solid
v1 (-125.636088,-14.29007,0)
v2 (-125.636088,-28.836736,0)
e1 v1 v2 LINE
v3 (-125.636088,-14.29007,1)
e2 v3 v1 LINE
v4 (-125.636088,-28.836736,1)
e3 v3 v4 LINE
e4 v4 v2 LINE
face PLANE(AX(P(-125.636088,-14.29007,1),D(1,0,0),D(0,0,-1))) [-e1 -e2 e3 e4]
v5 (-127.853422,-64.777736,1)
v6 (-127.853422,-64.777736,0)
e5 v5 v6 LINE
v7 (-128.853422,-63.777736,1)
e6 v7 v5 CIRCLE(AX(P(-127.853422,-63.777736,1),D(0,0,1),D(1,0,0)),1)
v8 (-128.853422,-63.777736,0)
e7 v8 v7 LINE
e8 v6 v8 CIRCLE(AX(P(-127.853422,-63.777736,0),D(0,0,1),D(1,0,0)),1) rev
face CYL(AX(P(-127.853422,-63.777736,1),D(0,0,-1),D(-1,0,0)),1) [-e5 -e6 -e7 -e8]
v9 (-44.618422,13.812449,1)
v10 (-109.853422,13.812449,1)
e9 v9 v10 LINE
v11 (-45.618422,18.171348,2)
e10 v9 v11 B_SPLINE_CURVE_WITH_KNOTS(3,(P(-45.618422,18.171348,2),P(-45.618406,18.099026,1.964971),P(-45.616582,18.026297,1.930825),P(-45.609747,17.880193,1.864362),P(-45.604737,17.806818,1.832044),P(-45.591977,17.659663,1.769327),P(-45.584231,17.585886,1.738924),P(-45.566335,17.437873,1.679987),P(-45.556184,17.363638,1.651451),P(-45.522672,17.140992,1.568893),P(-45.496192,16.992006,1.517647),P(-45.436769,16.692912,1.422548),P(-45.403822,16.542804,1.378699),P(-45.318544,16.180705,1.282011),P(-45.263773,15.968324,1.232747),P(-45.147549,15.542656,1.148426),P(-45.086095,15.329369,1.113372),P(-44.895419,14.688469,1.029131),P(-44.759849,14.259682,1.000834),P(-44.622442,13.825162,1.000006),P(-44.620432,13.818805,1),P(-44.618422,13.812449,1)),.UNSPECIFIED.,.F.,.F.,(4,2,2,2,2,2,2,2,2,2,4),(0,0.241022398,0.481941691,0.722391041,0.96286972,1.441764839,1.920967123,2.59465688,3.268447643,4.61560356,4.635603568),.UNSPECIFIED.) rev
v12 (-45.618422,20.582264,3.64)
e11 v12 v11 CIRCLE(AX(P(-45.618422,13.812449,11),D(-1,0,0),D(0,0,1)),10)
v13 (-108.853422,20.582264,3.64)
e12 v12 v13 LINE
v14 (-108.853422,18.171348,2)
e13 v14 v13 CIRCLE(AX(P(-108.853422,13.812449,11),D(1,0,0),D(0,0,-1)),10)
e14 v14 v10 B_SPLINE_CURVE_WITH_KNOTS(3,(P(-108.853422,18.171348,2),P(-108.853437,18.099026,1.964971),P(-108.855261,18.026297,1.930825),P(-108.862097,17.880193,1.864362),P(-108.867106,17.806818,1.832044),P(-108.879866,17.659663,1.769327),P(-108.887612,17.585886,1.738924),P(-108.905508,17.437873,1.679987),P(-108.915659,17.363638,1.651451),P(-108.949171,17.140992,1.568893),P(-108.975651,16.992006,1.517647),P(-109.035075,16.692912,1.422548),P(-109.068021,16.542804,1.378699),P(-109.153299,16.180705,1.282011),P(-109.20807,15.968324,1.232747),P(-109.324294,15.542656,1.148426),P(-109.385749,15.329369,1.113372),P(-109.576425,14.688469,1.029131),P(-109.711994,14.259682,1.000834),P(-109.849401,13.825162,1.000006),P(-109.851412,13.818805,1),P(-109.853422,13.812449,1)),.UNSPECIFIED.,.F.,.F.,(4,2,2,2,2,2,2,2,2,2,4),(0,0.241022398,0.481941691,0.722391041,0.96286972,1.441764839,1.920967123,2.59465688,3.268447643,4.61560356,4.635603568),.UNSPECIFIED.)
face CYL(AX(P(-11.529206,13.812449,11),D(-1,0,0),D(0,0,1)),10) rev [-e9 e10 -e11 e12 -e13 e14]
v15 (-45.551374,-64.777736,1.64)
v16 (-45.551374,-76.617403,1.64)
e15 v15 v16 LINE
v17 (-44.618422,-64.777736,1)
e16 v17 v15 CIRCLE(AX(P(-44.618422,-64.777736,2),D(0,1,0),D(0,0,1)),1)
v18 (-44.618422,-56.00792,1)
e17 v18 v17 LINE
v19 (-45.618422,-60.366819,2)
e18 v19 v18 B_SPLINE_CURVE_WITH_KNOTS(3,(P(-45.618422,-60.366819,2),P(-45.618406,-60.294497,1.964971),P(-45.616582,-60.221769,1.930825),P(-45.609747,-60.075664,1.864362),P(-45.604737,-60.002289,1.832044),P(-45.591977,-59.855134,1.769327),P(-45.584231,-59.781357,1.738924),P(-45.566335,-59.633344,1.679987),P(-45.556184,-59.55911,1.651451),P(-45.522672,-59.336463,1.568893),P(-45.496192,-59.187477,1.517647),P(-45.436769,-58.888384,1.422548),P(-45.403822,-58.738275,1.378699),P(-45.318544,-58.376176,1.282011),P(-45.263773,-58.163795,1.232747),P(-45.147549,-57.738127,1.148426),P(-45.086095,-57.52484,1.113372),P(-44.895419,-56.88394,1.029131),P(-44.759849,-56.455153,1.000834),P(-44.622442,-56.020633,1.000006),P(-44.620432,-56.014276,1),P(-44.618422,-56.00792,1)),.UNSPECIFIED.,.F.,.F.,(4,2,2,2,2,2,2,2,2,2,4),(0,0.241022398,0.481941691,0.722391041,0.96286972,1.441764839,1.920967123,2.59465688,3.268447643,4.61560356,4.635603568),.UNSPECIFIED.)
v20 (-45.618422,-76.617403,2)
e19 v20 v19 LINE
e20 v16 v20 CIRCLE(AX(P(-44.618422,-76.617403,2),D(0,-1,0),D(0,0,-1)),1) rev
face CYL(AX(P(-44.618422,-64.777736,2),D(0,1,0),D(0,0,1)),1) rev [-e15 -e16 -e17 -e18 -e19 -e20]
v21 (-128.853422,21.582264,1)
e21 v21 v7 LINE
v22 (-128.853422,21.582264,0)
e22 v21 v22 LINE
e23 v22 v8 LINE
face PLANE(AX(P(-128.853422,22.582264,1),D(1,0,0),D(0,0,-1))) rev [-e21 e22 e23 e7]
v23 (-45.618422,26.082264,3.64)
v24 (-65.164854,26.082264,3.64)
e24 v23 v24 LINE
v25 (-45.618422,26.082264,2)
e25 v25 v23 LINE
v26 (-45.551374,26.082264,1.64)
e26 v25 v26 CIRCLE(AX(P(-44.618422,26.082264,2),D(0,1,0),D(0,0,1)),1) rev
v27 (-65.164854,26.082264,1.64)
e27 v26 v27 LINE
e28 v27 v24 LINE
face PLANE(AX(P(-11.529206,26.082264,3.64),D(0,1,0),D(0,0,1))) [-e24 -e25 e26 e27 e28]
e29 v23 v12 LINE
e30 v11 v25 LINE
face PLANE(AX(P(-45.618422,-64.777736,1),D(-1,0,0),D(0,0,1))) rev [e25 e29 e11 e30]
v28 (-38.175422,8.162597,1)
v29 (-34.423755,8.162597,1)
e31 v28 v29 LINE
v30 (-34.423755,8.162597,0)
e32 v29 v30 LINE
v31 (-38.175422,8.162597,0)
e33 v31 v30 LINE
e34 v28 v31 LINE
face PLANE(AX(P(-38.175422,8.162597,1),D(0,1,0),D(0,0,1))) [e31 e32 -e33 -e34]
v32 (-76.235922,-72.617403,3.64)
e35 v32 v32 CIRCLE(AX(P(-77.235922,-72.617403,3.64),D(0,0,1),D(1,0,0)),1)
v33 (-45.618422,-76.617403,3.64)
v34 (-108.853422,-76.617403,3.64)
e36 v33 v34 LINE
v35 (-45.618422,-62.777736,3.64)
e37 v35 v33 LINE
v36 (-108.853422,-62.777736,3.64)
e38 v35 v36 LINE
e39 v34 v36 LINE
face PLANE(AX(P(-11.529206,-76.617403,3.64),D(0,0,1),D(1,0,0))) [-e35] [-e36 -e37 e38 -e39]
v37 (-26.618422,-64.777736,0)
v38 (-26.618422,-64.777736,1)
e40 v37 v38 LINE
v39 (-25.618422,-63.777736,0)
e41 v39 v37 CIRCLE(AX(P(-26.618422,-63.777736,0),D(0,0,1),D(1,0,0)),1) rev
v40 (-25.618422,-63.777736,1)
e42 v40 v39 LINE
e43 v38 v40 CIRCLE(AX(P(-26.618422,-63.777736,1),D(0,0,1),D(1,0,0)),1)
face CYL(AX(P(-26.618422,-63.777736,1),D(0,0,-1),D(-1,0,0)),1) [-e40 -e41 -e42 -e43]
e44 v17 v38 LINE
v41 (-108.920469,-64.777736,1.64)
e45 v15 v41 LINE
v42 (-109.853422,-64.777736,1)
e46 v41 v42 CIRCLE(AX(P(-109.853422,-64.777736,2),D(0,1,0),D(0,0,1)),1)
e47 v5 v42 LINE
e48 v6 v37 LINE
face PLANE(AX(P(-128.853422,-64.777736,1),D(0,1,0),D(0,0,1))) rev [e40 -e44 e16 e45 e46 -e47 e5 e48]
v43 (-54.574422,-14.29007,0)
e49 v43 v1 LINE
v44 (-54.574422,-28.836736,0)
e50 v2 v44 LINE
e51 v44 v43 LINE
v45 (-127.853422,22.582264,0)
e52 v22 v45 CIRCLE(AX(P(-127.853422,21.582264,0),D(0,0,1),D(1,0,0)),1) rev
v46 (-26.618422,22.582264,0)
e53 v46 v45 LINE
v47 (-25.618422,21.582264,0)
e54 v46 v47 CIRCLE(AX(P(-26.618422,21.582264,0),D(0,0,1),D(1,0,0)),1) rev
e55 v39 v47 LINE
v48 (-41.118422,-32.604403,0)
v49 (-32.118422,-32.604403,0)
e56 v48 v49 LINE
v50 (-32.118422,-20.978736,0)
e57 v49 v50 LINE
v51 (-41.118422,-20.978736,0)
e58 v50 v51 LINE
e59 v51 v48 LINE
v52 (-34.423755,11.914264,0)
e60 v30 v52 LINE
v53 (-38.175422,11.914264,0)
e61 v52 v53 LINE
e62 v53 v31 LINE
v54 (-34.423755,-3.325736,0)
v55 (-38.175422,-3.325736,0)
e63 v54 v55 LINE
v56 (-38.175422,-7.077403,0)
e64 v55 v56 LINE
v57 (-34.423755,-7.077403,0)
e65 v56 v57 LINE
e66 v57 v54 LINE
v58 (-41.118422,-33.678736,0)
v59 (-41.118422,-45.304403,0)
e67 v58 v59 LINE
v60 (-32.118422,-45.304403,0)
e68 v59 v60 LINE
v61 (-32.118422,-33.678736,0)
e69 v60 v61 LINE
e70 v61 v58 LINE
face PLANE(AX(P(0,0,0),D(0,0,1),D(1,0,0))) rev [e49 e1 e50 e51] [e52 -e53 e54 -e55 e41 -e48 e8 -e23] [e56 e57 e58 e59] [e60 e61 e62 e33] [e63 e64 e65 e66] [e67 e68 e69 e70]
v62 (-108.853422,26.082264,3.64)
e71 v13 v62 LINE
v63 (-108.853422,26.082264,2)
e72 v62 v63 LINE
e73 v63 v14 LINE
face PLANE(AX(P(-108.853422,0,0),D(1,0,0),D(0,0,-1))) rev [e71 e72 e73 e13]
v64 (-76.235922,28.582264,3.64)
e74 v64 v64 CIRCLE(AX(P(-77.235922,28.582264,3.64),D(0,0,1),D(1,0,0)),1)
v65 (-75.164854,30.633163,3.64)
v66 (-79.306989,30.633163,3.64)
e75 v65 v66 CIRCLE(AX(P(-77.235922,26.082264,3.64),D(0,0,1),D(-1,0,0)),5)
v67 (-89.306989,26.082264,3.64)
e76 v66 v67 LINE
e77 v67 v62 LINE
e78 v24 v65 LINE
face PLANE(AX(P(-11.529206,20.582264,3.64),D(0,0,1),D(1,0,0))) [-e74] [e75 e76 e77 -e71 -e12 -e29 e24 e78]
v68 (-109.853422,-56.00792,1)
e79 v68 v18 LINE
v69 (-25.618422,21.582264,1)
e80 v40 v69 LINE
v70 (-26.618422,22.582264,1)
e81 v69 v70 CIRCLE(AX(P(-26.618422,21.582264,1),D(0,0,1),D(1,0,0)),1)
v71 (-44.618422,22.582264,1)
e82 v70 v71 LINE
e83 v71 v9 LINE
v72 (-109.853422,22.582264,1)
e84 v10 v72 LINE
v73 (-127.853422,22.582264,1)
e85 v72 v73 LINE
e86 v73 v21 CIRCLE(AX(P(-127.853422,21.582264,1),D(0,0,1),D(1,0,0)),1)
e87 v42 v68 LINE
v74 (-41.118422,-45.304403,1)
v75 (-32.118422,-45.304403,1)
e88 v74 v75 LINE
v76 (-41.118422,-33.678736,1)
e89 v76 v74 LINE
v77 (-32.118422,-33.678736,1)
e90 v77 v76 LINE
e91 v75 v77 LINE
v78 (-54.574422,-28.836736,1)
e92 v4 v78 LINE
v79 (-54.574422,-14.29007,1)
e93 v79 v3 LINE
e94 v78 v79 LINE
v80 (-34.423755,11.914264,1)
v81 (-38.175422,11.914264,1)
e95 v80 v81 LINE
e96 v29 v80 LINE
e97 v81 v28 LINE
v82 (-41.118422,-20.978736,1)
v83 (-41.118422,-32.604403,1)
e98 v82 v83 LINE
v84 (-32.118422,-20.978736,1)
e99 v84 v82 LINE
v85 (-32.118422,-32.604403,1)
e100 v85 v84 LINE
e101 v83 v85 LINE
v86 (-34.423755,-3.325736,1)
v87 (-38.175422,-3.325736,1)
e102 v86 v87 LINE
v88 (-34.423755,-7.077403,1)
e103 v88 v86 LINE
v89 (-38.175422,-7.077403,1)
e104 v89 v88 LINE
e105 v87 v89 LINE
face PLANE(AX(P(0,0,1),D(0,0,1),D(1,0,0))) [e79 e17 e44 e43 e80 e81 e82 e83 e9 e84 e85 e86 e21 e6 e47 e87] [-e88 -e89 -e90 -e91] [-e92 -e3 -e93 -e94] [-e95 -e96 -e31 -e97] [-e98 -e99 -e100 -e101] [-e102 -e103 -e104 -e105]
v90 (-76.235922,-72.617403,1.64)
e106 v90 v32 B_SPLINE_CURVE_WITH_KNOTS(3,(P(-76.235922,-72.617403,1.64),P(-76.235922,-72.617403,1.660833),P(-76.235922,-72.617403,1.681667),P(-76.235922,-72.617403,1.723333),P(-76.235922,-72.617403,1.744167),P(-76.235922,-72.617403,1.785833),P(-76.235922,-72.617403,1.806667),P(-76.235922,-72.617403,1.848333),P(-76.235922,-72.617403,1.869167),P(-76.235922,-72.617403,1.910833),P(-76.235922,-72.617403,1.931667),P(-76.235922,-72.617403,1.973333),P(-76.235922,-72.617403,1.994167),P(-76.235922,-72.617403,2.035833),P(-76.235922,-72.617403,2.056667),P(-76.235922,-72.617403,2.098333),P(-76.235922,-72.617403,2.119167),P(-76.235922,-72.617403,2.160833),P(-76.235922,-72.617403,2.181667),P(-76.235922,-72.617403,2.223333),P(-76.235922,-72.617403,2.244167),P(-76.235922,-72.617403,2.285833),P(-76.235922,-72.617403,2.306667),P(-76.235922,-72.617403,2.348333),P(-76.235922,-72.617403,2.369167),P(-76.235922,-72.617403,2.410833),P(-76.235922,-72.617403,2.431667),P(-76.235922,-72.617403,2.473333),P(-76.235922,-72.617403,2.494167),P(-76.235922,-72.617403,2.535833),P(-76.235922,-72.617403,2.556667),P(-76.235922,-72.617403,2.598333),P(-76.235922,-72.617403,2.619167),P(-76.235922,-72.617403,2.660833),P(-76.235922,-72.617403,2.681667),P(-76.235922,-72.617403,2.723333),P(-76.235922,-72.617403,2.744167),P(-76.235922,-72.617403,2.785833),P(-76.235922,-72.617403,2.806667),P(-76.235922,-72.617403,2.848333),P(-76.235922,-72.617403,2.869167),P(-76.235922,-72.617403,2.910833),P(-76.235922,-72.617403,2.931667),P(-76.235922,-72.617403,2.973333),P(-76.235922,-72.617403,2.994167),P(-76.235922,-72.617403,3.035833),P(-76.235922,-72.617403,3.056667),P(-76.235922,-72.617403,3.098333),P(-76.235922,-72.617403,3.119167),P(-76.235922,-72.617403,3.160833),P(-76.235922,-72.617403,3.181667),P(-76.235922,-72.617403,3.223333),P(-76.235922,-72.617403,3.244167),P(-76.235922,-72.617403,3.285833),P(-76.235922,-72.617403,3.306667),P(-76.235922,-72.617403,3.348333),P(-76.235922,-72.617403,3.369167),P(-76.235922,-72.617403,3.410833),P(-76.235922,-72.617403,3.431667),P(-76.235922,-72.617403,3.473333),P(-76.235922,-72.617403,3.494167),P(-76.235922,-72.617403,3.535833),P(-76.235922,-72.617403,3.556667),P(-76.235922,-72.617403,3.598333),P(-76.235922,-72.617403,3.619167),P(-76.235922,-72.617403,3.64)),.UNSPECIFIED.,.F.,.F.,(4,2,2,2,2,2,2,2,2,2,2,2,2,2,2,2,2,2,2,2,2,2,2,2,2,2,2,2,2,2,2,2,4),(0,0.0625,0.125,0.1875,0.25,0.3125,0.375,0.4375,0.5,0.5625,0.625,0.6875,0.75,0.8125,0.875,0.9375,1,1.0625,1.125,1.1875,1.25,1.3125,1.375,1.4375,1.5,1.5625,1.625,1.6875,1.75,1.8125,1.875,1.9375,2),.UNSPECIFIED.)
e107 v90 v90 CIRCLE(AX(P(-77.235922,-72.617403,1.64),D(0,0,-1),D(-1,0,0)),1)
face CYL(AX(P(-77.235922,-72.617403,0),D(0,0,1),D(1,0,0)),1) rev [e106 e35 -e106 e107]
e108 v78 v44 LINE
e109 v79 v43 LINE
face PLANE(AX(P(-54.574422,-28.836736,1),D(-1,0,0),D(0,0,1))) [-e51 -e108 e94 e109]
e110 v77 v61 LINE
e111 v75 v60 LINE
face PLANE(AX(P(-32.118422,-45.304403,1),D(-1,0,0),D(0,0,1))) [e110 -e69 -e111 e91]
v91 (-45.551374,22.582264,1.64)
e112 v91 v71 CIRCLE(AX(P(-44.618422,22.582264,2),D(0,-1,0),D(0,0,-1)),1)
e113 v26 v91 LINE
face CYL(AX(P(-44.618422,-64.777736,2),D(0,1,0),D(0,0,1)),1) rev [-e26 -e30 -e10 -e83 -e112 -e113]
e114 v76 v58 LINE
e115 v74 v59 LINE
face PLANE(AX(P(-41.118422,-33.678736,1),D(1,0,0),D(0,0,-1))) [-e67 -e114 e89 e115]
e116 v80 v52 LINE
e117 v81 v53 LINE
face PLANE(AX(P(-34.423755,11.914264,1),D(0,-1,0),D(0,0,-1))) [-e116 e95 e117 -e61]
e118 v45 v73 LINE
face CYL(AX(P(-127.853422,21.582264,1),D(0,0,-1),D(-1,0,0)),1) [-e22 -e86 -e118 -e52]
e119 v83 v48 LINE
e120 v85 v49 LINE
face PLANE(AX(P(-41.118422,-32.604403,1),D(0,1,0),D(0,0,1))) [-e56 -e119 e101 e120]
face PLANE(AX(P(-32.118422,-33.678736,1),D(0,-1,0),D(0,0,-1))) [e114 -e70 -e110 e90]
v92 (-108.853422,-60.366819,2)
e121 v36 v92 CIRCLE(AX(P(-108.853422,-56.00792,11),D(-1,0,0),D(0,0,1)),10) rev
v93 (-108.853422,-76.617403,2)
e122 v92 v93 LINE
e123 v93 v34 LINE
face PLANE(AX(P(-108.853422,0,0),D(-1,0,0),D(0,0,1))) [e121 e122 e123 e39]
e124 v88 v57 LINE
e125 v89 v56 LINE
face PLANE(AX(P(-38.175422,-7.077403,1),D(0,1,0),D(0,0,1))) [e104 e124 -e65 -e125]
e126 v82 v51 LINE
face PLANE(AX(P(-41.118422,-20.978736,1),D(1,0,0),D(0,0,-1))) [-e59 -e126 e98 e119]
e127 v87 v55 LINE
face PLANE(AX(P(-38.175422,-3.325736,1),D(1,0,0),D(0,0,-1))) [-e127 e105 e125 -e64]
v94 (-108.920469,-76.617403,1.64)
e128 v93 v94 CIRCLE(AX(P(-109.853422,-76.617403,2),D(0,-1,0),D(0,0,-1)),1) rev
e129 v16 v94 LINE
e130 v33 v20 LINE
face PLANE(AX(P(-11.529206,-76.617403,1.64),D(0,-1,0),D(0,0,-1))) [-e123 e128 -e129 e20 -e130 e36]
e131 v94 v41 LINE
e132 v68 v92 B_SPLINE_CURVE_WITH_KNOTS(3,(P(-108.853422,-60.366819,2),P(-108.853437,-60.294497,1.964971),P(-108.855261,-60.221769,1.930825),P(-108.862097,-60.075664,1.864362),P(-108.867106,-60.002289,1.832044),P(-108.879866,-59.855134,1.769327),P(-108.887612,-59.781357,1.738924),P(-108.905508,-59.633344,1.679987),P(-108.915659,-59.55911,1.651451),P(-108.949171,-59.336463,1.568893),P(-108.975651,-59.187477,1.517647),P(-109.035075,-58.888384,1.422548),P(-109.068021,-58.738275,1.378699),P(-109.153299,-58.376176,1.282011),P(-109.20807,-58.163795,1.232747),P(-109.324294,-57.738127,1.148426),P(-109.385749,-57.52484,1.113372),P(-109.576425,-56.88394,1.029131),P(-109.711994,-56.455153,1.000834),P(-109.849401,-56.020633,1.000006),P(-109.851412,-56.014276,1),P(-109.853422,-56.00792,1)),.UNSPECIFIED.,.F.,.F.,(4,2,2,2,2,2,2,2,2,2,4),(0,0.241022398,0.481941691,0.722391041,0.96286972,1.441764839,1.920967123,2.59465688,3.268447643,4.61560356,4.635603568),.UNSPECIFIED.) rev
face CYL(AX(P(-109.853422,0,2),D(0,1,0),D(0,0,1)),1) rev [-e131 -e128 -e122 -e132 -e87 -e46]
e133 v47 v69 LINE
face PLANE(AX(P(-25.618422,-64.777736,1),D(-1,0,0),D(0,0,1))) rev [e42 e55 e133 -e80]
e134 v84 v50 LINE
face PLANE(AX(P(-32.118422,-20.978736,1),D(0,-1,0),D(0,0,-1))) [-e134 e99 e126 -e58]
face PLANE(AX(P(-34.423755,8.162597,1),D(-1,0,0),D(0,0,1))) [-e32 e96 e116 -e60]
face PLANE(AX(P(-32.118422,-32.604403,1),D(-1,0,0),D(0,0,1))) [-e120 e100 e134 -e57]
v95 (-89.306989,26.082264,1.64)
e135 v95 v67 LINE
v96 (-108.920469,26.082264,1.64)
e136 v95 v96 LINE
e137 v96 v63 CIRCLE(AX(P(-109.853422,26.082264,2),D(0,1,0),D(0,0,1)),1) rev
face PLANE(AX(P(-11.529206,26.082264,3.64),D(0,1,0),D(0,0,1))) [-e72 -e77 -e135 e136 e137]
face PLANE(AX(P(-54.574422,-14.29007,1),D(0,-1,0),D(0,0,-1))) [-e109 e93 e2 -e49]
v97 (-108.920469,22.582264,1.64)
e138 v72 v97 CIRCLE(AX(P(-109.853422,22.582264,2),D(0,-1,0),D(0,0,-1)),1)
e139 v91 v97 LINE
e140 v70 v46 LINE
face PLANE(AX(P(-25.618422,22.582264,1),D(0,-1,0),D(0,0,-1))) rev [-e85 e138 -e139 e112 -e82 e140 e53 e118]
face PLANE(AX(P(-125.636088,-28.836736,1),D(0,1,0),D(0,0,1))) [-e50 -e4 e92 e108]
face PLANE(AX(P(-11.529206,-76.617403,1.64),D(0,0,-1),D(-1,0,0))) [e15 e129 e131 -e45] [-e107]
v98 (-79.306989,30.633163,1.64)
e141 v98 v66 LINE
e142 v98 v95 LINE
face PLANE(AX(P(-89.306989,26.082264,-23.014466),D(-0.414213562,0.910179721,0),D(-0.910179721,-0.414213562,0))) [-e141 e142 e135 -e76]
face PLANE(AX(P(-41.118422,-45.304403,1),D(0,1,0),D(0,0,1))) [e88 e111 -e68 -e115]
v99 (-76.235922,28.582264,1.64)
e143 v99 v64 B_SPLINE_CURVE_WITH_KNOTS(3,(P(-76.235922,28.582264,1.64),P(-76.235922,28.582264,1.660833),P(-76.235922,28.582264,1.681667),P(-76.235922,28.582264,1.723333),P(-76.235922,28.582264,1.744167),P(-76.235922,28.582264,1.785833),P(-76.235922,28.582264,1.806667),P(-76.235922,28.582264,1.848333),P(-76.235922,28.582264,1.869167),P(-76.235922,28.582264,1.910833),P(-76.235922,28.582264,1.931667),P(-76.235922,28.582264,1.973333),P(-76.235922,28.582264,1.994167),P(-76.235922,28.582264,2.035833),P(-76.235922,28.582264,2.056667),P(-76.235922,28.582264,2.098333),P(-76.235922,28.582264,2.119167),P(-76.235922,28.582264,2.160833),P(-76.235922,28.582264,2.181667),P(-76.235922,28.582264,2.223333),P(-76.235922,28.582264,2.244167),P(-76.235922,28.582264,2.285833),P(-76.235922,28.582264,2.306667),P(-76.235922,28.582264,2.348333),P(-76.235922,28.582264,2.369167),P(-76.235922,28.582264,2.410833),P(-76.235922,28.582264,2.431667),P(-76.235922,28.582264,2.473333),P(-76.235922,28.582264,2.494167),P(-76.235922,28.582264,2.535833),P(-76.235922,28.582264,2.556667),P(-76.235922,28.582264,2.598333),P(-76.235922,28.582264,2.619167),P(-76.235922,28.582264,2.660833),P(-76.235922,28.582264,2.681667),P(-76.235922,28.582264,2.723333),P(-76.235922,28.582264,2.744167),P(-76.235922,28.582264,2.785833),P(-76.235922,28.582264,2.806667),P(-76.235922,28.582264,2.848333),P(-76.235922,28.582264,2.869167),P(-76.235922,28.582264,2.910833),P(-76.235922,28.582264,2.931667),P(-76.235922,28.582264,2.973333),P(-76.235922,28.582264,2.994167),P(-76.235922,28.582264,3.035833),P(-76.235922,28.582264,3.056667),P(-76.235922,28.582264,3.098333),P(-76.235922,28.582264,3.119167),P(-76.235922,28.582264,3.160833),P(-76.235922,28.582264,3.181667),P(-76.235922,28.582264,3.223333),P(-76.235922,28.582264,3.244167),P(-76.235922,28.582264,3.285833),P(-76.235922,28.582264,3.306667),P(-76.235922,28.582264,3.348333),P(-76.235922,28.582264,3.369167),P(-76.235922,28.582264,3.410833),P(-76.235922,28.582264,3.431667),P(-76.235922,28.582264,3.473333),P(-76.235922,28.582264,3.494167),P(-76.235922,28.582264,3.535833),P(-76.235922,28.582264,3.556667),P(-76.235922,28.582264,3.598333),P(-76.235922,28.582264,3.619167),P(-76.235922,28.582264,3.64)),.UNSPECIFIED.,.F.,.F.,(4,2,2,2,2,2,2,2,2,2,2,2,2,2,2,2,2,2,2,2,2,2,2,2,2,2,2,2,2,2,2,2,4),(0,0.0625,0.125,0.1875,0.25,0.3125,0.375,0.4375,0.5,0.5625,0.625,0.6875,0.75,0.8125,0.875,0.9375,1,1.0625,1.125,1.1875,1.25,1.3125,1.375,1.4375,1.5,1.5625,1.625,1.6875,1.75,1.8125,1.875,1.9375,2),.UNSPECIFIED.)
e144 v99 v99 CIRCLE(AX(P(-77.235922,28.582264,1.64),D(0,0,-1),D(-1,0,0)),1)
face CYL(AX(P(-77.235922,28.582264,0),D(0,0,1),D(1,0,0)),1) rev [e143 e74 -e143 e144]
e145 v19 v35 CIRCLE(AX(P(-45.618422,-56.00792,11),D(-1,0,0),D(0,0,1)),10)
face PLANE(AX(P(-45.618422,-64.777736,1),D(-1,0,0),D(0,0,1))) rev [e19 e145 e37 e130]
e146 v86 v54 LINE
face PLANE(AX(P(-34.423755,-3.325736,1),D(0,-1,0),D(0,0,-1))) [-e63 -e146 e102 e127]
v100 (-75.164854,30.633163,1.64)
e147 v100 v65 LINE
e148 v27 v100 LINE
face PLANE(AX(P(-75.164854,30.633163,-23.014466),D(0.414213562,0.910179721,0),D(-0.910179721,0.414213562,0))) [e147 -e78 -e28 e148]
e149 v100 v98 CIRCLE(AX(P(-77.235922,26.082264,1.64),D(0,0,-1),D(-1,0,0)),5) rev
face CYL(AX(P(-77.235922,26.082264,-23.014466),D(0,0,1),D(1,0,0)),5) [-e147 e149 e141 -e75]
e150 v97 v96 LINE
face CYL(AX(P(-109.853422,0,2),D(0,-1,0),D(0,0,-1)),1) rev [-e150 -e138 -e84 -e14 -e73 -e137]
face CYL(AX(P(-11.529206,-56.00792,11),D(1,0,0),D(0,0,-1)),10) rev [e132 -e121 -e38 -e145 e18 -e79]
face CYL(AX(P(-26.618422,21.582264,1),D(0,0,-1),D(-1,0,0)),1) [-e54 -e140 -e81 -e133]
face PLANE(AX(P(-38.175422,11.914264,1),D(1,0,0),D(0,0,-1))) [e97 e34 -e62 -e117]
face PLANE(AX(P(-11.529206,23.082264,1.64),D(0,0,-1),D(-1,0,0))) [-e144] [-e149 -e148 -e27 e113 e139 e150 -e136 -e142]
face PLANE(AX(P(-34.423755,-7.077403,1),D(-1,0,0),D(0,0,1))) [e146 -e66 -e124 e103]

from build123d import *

# Parameters (mm, degrees)
SKETCH2_W           = 103.235
SKETCH2_H           = 87.36
SKETCH2_W_2         = 9
SKETCH2_H_2         = 11.625667
SKETCH2_W_3         = 3.751667
SKETCH2_H_3         = 3.751667
SKETCH2_W_4         = 71.061666
SKETCH2_H_4         = 14.546666
BOSS_EXTRUDE1_DEPTH = 1
BOSS_EXTRUDE2_START = -20
BOSS_EXTRUDE2_DEPTH = 63.235
FILLET1_R           = 10
FILLET2_R           = 1
FILLET4_R           = 1
BOSS_EXTRUDE3_DEPTH = 2
SKETCH5_R           = 1
CUT_EXTRUDE1_DEPTH  = 150.95559423


with BuildPart() as part:
    # Sketch2 → Boss-Extrude1 (new body)
    with BuildSketch(Plane.XY):
        with Locations((-77.235921563, -21.097735573)):
            Rectangle(SKETCH2_W, SKETCH2_H)
        with Locations((-36.618421563, -39.491569073)):
            Rectangle(SKETCH2_W_2, SKETCH2_H_2, mode=Mode.SUBTRACT)
        with Locations((-36.618421563, -26.791569073)):
            Rectangle(SKETCH2_W_2, SKETCH2_H_2, mode=Mode.SUBTRACT)
        with Locations((-36.299588063, -5.201569073)):
            Rectangle(SKETCH2_W_3, SKETCH2_H_3, mode=Mode.SUBTRACT)
        with Locations((-36.299588063, 10.038430927)):
            Rectangle(SKETCH2_W_3, SKETCH2_H_3, mode=Mode.SUBTRACT)
        with Locations((-90.105254563, -21.563402573)):
            Rectangle(SKETCH2_W_4, SKETCH2_H_4, mode=Mode.SUBTRACT)
    extrude(amount=BOSS_EXTRUDE1_DEPTH)

    # Sketch4 → Boss-Extrude2 (add)
    with BuildSketch(Plane.ZY.offset(128.853421563).offset(BOSS_EXTRUDE2_START)):
        Polygon((1.64, 23.082264427), (1.64, 26.082264427), (3.64, 26.082264427), (3.64, 20.582264427), (1, 20.582264427), (1, 22.582264427), (1.64, 22.582264427), align=None)
        Polygon((1.64, -76.617402573), (1.64, -73.617402573), (1.64, -64.777735573), (1, -64.777735573), (1, -62.777735573), (3.64, -62.777735573), (3.64, -76.617402573), align=None)
    extrude(amount=-BOSS_EXTRUDE2_DEPTH)

    # Fillet1
    # the kernel refuses this fillet: 10 mm, written as the material it adds along each edge
    with BuildSketch(Plane(origin=(-108.853421563, -62.777735573, 1), x_dir=(0, 1, 0), z_dir=(1, 0, 0))) as fillet1_piece_1:
        with BuildLine():
            CenterArc((6.769815359, 10), FILLET1_R, 227.39178247, 42.60821753)
            Line((0, 2.64), (-0.135396307, 2.4928))
            ThreePointArc((-0.135396307, 2.4928), (-0.2, 1.32), (-0.2, 0))
            Line((-0.2, 0), (0, -0.2))
            Line((0, -0.2), (6.769815359, -0.2))
            Line((6.769815359, -0.2), (6.769815359, 0))
        make_face()
    extrude(amount=63.235)
    with BuildSketch(Plane(origin=(-108.853421563, 20.582264427, 1), x_dir=(0, -1, 0), z_dir=(1, 0, 0))) as fillet1_piece_2:
        with BuildLine():
            CenterArc((6.769815359, -10), FILLET1_R, 90, 42.60821753)
            Line((0, -2.64), (-0.135396307, -2.4928))
            ThreePointArc((-0.135396307, -2.4928), (-0.2, -1.32), (-0.2, 0))
            Line((-0.2, 0), (0, 0.2))
            Line((0, 0.2), (6.769815359, 0.2))
            Line((6.769815359, 0.2), (6.769815359, 0))
        make_face()
    extrude(amount=63.235)

    # Fillet2
    fillet2_edges = [part.edges().sort_by_distance(p)[0] for p in [
        (-128.853421563, 22.582264427, 0.5),
        (-128.853421563, -64.777735573, 0.5),
        (-25.618421563, -64.777735573, 0.5),
        (-25.618421563, 22.582264427, 0.5),
    ]]
    fillet(fillet2_edges, radius=FILLET2_R)

    # Fillet4
    fillet4_edges = [part.edges().sort_by_distance(p)[0] for p in [
        (-45.618421563, -60.392827893, 1),
    ]]
    fillet(fillet4_edges, radius=FILLET4_R)
    fillet4_2_edges = [part.edges().sort_by_distance(p)[0] for p in [
        (-108.853421563, -60.392827893, 1),
    ]]
    fillet(fillet4_2_edges, radius=FILLET4_R)
    fillet4_3_edges = [part.edges().sort_by_distance(p)[0] for p in [
        (-45.618421563, 18.197356748, 1),
    ]]
    fillet(fillet4_3_edges, radius=FILLET4_R)
    fillet4_4_edges = [part.edges().sort_by_distance(p)[0] for p in [
        (-108.853421563, 18.197356748, 1),
    ]]
    fillet(fillet4_4_edges, radius=FILLET4_R)

    # Sketch6 → Boss-Extrude3 (add)
    with BuildSketch(Plane.XY.offset(3.64)):
        with BuildLine():
            Line((-89.306989375, 26.082264427), (-79.306989375, 30.633163033))
            ThreePointArc((-79.306989375, 30.633163033), (-77.235921563, 31.082264427), (-75.164853752, 30.633163033))
            Line((-75.164853752, 30.633163033), (-65.164853752, 26.082264427))
            Line((-65.164853752, 26.082264427), (-89.306989375, 26.082264427))
        make_face()
    extrude(amount=-BOSS_EXTRUDE3_DEPTH)

    # Sketch5 → Cut-Extrude1 (cut, through all)
    with BuildSketch(Plane.XY.offset(3.64)):
        with Locations((-77.235921563, -72.617402573)):
            Circle(SKETCH5_R)
        with Locations((-77.235921563, 28.582264427)):
            Circle(SKETCH5_R)
    extrude(amount=-CUT_EXTRUDE1_DEPTH, mode=Mode.SUBTRACT)


solid = part.part
